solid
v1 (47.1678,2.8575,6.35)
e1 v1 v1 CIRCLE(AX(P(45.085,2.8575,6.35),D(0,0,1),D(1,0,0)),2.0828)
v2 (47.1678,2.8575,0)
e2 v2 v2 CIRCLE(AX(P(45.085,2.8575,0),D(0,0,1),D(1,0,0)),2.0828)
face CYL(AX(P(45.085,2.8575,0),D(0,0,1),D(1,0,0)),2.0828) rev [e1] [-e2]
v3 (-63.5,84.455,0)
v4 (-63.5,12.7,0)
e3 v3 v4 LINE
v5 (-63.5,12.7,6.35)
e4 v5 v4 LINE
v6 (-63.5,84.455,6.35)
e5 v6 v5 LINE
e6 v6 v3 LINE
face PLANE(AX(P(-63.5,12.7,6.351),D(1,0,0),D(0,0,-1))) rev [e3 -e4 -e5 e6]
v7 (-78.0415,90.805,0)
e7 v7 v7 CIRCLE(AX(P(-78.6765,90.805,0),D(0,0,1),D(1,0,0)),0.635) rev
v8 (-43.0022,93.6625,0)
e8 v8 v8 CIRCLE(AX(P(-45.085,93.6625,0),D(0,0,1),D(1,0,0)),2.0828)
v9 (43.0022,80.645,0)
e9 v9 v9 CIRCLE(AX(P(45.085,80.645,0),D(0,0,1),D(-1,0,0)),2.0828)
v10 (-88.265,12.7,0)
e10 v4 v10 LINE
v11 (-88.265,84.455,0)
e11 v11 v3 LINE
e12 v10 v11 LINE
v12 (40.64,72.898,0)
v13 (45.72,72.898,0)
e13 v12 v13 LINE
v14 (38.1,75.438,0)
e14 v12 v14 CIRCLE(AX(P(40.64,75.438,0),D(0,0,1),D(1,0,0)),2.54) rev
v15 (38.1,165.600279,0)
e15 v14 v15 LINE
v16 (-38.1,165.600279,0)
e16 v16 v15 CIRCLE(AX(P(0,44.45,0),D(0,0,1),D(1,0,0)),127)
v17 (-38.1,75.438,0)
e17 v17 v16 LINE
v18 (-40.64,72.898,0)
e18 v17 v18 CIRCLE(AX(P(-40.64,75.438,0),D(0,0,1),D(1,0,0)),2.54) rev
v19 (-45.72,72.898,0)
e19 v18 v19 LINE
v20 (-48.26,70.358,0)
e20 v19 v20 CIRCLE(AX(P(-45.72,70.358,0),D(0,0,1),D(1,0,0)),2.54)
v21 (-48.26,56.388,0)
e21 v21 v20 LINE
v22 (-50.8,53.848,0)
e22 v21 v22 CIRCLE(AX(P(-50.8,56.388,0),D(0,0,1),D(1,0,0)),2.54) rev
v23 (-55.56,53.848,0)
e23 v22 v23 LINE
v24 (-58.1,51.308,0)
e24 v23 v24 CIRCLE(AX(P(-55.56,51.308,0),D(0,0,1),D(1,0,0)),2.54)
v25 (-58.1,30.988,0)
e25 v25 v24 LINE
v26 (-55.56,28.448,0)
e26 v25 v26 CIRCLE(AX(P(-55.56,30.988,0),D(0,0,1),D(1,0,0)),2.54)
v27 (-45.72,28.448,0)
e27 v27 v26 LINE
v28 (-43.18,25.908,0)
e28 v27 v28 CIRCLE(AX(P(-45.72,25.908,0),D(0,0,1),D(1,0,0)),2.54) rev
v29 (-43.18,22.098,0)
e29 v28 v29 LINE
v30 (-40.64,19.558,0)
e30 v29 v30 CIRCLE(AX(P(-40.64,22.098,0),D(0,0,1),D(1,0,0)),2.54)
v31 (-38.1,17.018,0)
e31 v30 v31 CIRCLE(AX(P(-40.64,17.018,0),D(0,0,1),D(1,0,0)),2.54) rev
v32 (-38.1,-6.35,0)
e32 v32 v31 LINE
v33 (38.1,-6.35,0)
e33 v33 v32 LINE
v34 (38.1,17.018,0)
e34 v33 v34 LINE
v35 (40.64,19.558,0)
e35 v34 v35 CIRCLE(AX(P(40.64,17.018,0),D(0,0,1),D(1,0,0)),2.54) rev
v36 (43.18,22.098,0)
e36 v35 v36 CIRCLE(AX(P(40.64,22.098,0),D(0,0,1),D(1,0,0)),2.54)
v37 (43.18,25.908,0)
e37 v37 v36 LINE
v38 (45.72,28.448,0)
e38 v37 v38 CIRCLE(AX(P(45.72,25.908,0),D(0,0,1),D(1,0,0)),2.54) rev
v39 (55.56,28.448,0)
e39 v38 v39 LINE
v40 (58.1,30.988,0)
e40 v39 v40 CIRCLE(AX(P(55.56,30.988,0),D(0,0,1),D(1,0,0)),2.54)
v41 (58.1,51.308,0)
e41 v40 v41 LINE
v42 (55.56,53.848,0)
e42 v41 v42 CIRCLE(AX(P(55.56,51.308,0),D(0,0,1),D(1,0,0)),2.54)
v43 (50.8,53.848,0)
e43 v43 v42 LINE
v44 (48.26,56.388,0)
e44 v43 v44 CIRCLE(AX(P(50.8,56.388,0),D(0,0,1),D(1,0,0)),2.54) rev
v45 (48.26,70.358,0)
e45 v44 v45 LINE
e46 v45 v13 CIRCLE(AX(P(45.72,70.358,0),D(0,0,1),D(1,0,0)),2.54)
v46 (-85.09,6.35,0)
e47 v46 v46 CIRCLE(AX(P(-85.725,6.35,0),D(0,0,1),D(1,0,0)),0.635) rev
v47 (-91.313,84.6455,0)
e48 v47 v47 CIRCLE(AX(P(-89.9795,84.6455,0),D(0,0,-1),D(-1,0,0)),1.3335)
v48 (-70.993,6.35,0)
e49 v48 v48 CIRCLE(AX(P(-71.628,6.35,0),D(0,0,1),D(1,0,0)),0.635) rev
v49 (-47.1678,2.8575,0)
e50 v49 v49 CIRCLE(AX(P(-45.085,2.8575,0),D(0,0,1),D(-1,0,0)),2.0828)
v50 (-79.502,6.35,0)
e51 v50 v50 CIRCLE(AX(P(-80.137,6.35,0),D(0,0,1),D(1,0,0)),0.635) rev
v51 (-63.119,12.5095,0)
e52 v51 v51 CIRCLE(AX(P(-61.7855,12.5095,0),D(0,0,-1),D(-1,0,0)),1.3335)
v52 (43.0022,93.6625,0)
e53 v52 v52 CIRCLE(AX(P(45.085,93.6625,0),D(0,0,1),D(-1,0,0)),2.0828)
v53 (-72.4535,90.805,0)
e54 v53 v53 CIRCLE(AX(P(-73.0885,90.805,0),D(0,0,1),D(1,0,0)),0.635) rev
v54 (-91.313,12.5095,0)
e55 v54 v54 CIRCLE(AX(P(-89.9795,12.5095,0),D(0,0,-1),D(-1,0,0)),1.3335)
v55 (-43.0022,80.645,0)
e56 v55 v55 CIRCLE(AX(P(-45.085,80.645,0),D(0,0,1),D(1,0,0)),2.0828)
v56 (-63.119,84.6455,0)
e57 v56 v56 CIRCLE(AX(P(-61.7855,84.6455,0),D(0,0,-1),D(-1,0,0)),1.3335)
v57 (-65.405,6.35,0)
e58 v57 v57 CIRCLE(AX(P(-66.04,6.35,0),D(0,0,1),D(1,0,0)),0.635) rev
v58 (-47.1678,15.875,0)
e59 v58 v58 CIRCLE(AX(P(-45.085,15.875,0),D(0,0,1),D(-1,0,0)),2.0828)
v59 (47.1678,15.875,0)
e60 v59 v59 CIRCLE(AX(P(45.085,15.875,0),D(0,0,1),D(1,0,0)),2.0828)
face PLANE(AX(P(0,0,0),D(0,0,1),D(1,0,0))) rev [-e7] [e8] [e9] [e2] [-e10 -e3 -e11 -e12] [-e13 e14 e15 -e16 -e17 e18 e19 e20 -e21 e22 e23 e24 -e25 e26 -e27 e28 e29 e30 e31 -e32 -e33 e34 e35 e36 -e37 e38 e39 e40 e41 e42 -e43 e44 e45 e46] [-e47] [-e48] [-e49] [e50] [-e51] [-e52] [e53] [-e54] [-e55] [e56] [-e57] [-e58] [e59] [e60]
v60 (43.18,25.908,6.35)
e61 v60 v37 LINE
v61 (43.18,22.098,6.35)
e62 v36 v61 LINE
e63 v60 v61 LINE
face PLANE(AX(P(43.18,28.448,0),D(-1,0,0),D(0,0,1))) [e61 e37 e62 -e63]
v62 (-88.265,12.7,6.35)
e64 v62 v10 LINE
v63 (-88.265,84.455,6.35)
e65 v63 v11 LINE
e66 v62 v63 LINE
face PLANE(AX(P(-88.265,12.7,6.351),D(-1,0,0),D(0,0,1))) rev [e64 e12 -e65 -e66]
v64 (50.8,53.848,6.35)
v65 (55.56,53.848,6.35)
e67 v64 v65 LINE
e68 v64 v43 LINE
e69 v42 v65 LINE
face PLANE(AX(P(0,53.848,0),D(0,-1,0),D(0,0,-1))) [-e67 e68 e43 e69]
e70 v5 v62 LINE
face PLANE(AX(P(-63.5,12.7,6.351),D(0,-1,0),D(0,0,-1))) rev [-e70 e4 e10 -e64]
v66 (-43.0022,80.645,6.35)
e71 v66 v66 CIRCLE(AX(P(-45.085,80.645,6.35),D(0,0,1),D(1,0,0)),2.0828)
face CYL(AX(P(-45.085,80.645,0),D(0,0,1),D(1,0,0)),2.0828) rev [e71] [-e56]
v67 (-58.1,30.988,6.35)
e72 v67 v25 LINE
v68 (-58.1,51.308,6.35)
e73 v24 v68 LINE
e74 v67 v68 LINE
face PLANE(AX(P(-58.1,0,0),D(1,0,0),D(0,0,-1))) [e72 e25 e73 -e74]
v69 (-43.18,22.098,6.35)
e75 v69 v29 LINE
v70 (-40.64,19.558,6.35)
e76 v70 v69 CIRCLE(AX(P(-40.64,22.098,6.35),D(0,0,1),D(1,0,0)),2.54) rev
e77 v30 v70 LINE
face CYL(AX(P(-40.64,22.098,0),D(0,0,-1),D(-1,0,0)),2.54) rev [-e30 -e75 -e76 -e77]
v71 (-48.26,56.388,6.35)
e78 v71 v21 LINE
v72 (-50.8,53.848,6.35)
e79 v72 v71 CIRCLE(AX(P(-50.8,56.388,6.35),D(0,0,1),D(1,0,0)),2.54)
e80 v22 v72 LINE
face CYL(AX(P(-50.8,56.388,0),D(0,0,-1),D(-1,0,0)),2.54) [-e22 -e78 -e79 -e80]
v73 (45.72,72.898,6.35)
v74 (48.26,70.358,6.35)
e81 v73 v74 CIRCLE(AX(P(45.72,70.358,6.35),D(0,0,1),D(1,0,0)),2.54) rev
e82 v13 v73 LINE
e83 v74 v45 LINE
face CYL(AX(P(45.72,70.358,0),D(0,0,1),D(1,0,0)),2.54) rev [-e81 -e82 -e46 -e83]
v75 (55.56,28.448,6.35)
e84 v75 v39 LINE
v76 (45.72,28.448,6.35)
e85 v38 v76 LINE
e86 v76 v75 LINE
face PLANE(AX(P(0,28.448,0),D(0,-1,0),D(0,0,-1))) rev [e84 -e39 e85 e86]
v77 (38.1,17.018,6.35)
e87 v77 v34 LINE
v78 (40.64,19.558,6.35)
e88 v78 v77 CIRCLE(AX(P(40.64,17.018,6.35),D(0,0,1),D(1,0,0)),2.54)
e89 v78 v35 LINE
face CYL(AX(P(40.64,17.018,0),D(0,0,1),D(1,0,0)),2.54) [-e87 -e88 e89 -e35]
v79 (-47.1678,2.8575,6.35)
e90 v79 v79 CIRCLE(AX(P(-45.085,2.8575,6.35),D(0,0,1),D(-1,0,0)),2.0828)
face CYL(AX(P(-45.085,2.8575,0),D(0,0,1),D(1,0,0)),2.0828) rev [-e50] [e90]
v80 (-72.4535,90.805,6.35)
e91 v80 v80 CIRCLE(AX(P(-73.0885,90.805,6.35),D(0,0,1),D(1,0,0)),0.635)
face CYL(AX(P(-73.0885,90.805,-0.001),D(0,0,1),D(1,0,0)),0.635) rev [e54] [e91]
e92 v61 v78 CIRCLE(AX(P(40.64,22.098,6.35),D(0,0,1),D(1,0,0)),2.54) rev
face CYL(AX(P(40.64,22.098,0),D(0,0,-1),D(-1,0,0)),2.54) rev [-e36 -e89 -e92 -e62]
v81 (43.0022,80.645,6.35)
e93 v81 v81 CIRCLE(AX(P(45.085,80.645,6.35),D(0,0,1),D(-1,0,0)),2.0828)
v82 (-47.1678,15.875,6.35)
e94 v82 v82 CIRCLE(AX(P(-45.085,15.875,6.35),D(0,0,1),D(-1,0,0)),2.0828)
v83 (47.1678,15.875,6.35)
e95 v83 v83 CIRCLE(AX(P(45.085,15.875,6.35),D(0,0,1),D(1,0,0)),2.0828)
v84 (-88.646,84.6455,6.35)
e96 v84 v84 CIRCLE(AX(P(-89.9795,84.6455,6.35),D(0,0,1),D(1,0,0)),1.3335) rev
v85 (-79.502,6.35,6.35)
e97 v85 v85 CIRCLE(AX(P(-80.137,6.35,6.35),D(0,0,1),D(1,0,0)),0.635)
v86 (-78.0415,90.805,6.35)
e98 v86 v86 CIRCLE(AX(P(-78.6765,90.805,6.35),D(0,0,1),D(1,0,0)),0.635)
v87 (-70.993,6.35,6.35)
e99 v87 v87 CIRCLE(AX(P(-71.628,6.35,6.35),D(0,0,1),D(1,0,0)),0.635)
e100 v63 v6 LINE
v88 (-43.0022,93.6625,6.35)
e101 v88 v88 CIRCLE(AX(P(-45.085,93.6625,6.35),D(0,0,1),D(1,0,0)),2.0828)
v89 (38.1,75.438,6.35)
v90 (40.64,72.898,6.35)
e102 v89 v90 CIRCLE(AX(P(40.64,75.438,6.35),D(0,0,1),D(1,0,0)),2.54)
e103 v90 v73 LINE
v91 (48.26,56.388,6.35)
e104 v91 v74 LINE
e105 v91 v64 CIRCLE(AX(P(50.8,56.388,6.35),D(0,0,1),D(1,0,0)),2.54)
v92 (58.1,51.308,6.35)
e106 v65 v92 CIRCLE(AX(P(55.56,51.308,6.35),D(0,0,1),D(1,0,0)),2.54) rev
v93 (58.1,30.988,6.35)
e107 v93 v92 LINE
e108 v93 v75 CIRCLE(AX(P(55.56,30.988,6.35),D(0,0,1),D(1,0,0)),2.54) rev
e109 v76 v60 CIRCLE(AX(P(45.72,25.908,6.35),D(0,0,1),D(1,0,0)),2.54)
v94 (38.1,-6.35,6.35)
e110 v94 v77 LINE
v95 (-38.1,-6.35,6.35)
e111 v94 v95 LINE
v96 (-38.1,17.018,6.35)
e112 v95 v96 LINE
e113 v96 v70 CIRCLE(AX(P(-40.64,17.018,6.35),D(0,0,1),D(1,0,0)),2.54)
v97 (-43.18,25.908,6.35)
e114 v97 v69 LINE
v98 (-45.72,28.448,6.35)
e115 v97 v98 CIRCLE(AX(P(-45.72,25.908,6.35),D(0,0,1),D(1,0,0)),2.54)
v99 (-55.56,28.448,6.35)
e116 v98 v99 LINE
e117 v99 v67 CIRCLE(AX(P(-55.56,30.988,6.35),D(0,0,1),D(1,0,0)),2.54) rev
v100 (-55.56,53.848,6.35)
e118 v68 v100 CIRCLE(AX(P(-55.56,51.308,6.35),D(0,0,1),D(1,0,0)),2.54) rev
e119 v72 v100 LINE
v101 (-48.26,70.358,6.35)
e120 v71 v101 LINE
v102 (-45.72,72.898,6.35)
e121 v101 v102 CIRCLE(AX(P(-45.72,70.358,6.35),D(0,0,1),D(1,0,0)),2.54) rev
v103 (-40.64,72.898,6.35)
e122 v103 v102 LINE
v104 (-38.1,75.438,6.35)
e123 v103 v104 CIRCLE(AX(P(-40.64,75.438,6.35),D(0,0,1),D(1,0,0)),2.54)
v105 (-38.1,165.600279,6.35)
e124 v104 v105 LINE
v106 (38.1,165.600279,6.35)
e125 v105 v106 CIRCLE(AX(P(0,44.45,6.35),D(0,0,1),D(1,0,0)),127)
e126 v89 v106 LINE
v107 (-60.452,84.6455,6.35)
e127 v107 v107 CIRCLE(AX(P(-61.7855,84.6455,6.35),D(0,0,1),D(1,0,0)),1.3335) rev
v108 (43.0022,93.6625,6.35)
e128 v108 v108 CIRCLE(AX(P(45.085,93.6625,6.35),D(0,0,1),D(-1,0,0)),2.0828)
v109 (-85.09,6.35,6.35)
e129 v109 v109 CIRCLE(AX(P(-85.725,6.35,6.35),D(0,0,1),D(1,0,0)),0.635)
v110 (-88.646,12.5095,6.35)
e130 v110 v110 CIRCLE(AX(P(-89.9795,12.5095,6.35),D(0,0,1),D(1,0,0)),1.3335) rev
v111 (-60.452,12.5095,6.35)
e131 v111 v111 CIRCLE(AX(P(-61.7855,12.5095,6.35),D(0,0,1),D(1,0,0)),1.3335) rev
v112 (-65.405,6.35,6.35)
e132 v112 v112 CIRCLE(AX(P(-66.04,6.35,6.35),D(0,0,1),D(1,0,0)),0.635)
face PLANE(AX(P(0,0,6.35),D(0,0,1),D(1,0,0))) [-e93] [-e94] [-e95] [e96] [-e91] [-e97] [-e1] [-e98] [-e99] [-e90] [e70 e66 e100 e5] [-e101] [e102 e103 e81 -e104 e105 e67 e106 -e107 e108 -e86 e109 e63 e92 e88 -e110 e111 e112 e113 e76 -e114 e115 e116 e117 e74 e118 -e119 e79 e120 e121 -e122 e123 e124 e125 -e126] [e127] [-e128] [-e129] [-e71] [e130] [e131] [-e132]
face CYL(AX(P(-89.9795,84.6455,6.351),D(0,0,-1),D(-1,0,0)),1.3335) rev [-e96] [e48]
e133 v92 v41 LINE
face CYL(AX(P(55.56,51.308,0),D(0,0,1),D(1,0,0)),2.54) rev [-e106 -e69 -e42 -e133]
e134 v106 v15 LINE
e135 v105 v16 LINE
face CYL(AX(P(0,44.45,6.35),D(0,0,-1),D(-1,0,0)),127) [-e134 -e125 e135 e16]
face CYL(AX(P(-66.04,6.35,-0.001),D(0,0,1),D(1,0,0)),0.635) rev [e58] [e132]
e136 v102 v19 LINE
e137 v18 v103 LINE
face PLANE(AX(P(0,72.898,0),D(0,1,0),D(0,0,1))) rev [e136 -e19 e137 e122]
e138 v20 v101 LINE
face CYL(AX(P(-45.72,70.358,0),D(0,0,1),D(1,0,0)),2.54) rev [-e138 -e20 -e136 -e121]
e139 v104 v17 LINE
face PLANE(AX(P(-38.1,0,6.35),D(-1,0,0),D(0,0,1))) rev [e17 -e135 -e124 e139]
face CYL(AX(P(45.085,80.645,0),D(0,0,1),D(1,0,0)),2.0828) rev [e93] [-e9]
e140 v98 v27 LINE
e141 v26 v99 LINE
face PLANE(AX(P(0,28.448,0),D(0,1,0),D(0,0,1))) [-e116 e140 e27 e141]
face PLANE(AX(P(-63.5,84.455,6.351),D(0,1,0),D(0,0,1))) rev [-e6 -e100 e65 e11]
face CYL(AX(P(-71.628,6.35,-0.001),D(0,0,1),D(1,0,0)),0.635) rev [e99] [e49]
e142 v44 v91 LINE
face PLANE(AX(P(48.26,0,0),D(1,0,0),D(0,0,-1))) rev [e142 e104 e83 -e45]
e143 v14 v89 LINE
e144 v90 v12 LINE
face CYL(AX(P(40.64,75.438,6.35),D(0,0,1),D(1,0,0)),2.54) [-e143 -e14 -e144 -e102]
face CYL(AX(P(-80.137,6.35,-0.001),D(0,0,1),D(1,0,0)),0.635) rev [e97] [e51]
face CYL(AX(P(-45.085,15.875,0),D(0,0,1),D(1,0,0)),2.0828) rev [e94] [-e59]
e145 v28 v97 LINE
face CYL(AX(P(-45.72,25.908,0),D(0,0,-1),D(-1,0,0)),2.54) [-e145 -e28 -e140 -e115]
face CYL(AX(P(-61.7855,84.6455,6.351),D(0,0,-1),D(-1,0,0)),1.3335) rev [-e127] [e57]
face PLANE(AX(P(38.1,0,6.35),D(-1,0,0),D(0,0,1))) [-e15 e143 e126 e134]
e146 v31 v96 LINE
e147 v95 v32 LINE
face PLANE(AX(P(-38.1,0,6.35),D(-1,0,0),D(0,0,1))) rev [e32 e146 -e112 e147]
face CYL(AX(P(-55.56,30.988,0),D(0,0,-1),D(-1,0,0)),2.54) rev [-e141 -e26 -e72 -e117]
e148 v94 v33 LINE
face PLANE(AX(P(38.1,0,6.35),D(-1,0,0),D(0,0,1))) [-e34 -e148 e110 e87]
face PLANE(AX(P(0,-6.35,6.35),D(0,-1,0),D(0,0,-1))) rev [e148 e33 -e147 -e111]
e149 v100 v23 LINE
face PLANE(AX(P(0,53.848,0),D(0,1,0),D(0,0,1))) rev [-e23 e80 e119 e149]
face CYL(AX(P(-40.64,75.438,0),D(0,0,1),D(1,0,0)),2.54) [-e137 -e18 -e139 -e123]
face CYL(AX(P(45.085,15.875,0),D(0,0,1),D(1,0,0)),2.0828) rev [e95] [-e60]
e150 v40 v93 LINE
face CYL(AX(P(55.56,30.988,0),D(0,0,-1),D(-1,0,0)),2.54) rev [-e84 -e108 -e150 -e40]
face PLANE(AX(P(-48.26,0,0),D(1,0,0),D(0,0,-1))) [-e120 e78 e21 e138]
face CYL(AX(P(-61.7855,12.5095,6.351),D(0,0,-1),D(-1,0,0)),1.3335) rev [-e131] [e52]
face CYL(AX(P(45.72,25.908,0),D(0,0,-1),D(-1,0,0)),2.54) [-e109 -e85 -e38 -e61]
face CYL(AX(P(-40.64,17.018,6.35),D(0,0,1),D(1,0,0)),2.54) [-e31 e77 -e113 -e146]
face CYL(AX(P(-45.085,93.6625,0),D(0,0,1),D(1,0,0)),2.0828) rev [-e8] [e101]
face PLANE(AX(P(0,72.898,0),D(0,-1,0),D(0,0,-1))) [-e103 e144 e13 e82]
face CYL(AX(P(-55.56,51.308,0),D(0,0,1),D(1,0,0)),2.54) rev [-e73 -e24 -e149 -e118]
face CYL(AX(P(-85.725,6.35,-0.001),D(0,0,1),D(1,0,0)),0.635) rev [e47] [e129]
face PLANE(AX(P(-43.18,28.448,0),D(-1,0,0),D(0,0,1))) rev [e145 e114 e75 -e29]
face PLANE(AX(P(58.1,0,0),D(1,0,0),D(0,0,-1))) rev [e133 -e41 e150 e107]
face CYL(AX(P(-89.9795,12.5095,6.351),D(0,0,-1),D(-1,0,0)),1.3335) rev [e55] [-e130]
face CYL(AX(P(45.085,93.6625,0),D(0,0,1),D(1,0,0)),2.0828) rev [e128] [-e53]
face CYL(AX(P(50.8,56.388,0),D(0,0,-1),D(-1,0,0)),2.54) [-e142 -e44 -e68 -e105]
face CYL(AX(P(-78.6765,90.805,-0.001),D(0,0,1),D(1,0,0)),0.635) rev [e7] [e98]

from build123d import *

# Parameters (mm, degrees)
BOSS_EXTRUDE1_DEPTH = 6.35
CUT_EXTRUDE1_REACH  = 210.789
SKETCH2_R           = 1.3335
SKETCH2_W           = 24.765
SKETCH2_H           = 71.755
CUT_EXTRUDE2_REACH  = 210.789
SKETCH3_R           = 0.635
CUT_EXTRUDE3_DEPTH  = 209.788828163
FILLET1_START       = -1
FILLET1_DEPTH       = 8
FILLET1_2_DEPTH     = 6.35
SKETCH5_R           = 2.0828
CUT_EXTRUDE4_DEPTH  = 209.788828163


with BuildPart() as part:
    # Sketch1 → Boss-Extrude1 (new body)
    with BuildSketch(Plane.XY):
        with BuildLine():
            Line((-38.1, 92.71), (-38.1, 165.60027858))
            ThreePointArc((-38.1, 165.60027858), (0, -82.55), (38.1, 165.60027858))
            Line((38.1, 165.60027858), (38.1, 92.71))
            Line((38.1, 92.71), (38.1, -6.35))
            Line((38.1, -6.35), (-38.1, -6.35))
            Line((-38.1, -6.35), (-38.1, 92.71))
        make_face()
    extrude(amount=BOSS_EXTRUDE1_DEPTH)

    # Sketch2 → Cut-Extrude1 (cut, up to next)
    with BuildSketch(Plane(origin=(0, 0, 0), x_dir=(-1, 0, 0), z_dir=(0, 0, -1)), mode=Mode.PRIVATE) as cut_extrude1_sk1:
        with Locations((61.7855, 12.5095)):
            Circle(SKETCH2_R)
    cut_extrude1_tool1 = extrude(cut_extrude1_sk1.sketch, amount=-CUT_EXTRUDE1_REACH, mode=Mode.PRIVATE) & part.part
    # Sketch2 → Cut-Extrude1 (cut, up to next)
    with BuildSketch(Plane(origin=(0, 0, 0), x_dir=(-1, 0, 0), z_dir=(0, 0, -1)), mode=Mode.PRIVATE) as cut_extrude1_sk2:
        with Locations((61.7855, 84.6455)):
            Circle(SKETCH2_R)
    cut_extrude1_tool2 = extrude(cut_extrude1_sk2.sketch, amount=-CUT_EXTRUDE1_REACH, mode=Mode.PRIVATE) & part.part
    # Sketch2 → Cut-Extrude1 (cut, up to next)
    with BuildSketch(Plane(origin=(0, 0, 0), x_dir=(-1, 0, 0), z_dir=(0, 0, -1)), mode=Mode.PRIVATE) as cut_extrude1_sk3:
        with Locations((89.9795, 84.6455)):
            Circle(SKETCH2_R)
    cut_extrude1_tool3 = extrude(cut_extrude1_sk3.sketch, amount=-CUT_EXTRUDE1_REACH, mode=Mode.PRIVATE) & part.part
    # Sketch2 → Cut-Extrude1 (cut, up to next)
    with BuildSketch(Plane(origin=(0, 0, 0), x_dir=(-1, 0, 0), z_dir=(0, 0, -1)), mode=Mode.PRIVATE) as cut_extrude1_sk4:
        with Locations((89.9795, 12.5095)):
            Circle(SKETCH2_R)
    cut_extrude1_tool4 = extrude(cut_extrude1_sk4.sketch, amount=-CUT_EXTRUDE1_REACH, mode=Mode.PRIVATE) & part.part
    # Sketch2 → Cut-Extrude1 (cut, up to next)
    with BuildSketch(Plane(origin=(0, 0, 0), x_dir=(-1, 0, 0), z_dir=(0, 0, -1)), mode=Mode.PRIVATE) as cut_extrude1_sk5:
        with Locations((75.8825, 48.5775)):
            Rectangle(SKETCH2_W, SKETCH2_H)
    cut_extrude1_tool5 = extrude(cut_extrude1_sk5.sketch, amount=-CUT_EXTRUDE1_REACH, mode=Mode.PRIVATE) & part.part
    add(cut_extrude1_tool1.solids().sort_by_distance((-61.7855, 12.5095, 0))[0], mode=Mode.SUBTRACT)
    add(cut_extrude1_tool2.solids().sort_by_distance((-61.7855, 84.6455, 0))[0], mode=Mode.SUBTRACT)
    add(cut_extrude1_tool3.solids().sort_by_distance((-89.9795, 84.6455, 0))[0], mode=Mode.SUBTRACT)
    add(cut_extrude1_tool4.solids().sort_by_distance((-89.9795, 12.5095, 0))[0], mode=Mode.SUBTRACT)
    add(cut_extrude1_tool5.solids().sort_by_distance((-75.8825, 48.5775, 0))[0], mode=Mode.SUBTRACT)

    # Sketch3 → Cut-Extrude2 (cut, up to next)
    with BuildSketch(Plane.XY.offset(6.35), mode=Mode.PRIVATE) as cut_extrude2_sk1:
        with Locations((-66.04, 6.35)):
            Circle(SKETCH3_R)
    cut_extrude2_tool1 = extrude(cut_extrude2_sk1.sketch, amount=-CUT_EXTRUDE2_REACH, mode=Mode.PRIVATE) & part.part
    # Sketch3 → Cut-Extrude2 (cut, up to next)
    with BuildSketch(Plane.XY.offset(6.35), mode=Mode.PRIVATE) as cut_extrude2_sk2:
        with Locations((-71.628, 6.35)):
            Circle(SKETCH3_R)
    cut_extrude2_tool2 = extrude(cut_extrude2_sk2.sketch, amount=-CUT_EXTRUDE2_REACH, mode=Mode.PRIVATE) & part.part
    # Sketch3 → Cut-Extrude2 (cut, up to next)
    with BuildSketch(Plane.XY.offset(6.35), mode=Mode.PRIVATE) as cut_extrude2_sk3:
        with Locations((-80.137, 6.35)):
            Circle(SKETCH3_R)
    cut_extrude2_tool3 = extrude(cut_extrude2_sk3.sketch, amount=-CUT_EXTRUDE2_REACH, mode=Mode.PRIVATE) & part.part
    # Sketch3 → Cut-Extrude2 (cut, up to next)
    with BuildSketch(Plane.XY.offset(6.35), mode=Mode.PRIVATE) as cut_extrude2_sk4:
        with Locations((-85.725, 6.35)):
            Circle(SKETCH3_R)
    cut_extrude2_tool4 = extrude(cut_extrude2_sk4.sketch, amount=-CUT_EXTRUDE2_REACH, mode=Mode.PRIVATE) & part.part
    # Sketch3 → Cut-Extrude2 (cut, up to next)
    with BuildSketch(Plane.XY.offset(6.35), mode=Mode.PRIVATE) as cut_extrude2_sk5:
        with Locations((-73.0885, 90.805)):
            Circle(SKETCH3_R)
    cut_extrude2_tool5 = extrude(cut_extrude2_sk5.sketch, amount=-CUT_EXTRUDE2_REACH, mode=Mode.PRIVATE) & part.part
    # Sketch3 → Cut-Extrude2 (cut, up to next)
    with BuildSketch(Plane.XY.offset(6.35), mode=Mode.PRIVATE) as cut_extrude2_sk6:
        with Locations((-78.6765, 90.805)):
            Circle(SKETCH3_R)
    cut_extrude2_tool6 = extrude(cut_extrude2_sk6.sketch, amount=-CUT_EXTRUDE2_REACH, mode=Mode.PRIVATE) & part.part
    add(cut_extrude2_tool1.solids().sort_by_distance((-66.04, 6.35, 6.35))[0], mode=Mode.SUBTRACT)
    add(cut_extrude2_tool2.solids().sort_by_distance((-71.628, 6.35, 6.35))[0], mode=Mode.SUBTRACT)
    add(cut_extrude2_tool3.solids().sort_by_distance((-80.137, 6.35, 6.35))[0], mode=Mode.SUBTRACT)
    add(cut_extrude2_tool4.solids().sort_by_distance((-85.725, 6.35, 6.35))[0], mode=Mode.SUBTRACT)
    add(cut_extrude2_tool5.solids().sort_by_distance((-73.0885, 90.805, 6.35))[0], mode=Mode.SUBTRACT)
    add(cut_extrude2_tool6.solids().sort_by_distance((-78.6765, 90.805, 6.35))[0], mode=Mode.SUBTRACT)

    # Sketch4 → Cut-Extrude3 (cut, through all)
    with BuildSketch(Plane.XY.offset(6.35)):
        Polygon((-48.26, 72.898), (-48.26, 53.848), (-58.1, 53.848), (-58.1, 28.448), (-43.18, 28.448), (-43.18, 19.558), (-38.1, 19.558), (-38.1, 72.898), align=None)
        Polygon((43.18, 28.448), (58.1, 28.448), (58.1, 53.848), (48.26, 53.848), (48.26, 72.898), (38.1, 72.898), (38.1, 19.558), (43.18, 19.558), align=None)
    extrude(amount=-CUT_EXTRUDE3_DEPTH, mode=Mode.SUBTRACT)

    # Fillet1: read off the stored shape, not the designer's step
    # Fillet1 outline → Fillet1 (cut)
    with BuildSketch(Plane.XY.offset(FILLET1_START)):
        with BuildLine():
            Line((38.1, 72.898), (40.64, 72.898))
            ThreePointArc((40.64, 72.898), (38.843948776, 73.641948776), (38.1, 75.438))
            Line((38.1, 75.438), (38.1, 72.898))
        make_face()
        with BuildLine():
            Line((48.26, 53.848), (50.8, 53.848))
            ThreePointArc((50.8, 53.848), (49.003948776, 54.591948776), (48.26, 56.388))
            Line((48.26, 56.388), (48.26, 53.848))
        make_face()
        with BuildLine():
            Line((43.18, 28.448), (43.18, 25.908))
            ThreePointArc((43.18, 25.908), (43.923948776, 27.704051224), (45.72, 28.448))
            Line((45.72, 28.448), (43.18, 28.448))
        make_face()
        with BuildLine():
            ThreePointArc((38.1, 17.018), (38.843948776, 18.814051224), (40.64, 19.558))
            Line((40.64, 19.558), (38.1, 19.558))
            Line((38.1, 19.558), (38.1, 17.018))
        make_face()
        with BuildLine():
            Line((-38.1, 19.558), (-40.64, 19.558))
            ThreePointArc((-40.64, 19.558), (-38.843948776, 18.814051224), (-38.1, 17.018))
            Line((-38.1, 17.018), (-38.1, 19.558))
        make_face()
        with BuildLine():
            ThreePointArc((-38.1, 75.438), (-38.843948776, 73.641948776), (-40.64, 72.898))
            Line((-40.64, 72.898), (-38.1, 72.898))
            Line((-38.1, 72.898), (-38.1, 75.438))
        make_face()
        with BuildLine():
            ThreePointArc((-48.26, 56.388), (-49.003948776, 54.591948776), (-50.8, 53.848))
            Line((-50.8, 53.848), (-48.26, 53.848))
            Line((-48.26, 53.848), (-48.26, 56.388))
        make_face()
        with BuildLine():
            ThreePointArc((-45.72, 28.448), (-43.923948776, 27.704051224), (-43.18, 25.908))
            Line((-43.18, 25.908), (-43.18, 28.448))
            Line((-43.18, 28.448), (-45.72, 28.448))
        make_face()
    extrude(amount=FILLET1_DEPTH, mode=Mode.SUBTRACT)

    # Fillet1 2 outline → Fillet1 2 (add)
    with BuildSketch(Plane.XY):
        with BuildLine():
            Line((43.18, 19.558), (43.18, 22.098))
            ThreePointArc((43.18, 22.098), (42.436051224, 20.301948776), (40.64, 19.558))
            Line((40.64, 19.558), (43.18, 19.558))
        make_face()
        with BuildLine():
            ThreePointArc((45.72, 72.898), (47.516051224, 72.154051224), (48.26, 70.358))
            Line((48.26, 70.358), (48.26, 72.898))
            Line((48.26, 72.898), (45.72, 72.898))
        make_face()
        with BuildLine():
            ThreePointArc((55.56, 53.848), (57.356051224, 53.104051224), (58.1, 51.308))
            Line((58.1, 51.308), (58.1, 53.848))
            Line((58.1, 53.848), (55.56, 53.848))
        make_face()
        with BuildLine():
            ThreePointArc((58.1, 30.988), (57.356051224, 29.191948776), (55.56, 28.448))
            Line((55.56, 28.448), (58.1, 28.448))
            Line((58.1, 28.448), (58.1, 30.988))
        make_face()
        with BuildLine():
            Line((-43.18, 19.558), (-40.64, 19.558))
            ThreePointArc((-40.64, 19.558), (-42.436051224, 20.301948776), (-43.18, 22.098))
            Line((-43.18, 22.098), (-43.18, 19.558))
        make_face()
        with BuildLine():
            Line((-48.26, 72.898), (-48.26, 70.358))
            ThreePointArc((-48.26, 70.358), (-47.516051224, 72.154051224), (-45.72, 72.898))
            Line((-45.72, 72.898), (-48.26, 72.898))
        make_face()
        with BuildLine():
            Line((-58.1, 53.848), (-58.1, 51.308))
            ThreePointArc((-58.1, 51.308), (-57.356051224, 53.104051224), (-55.56, 53.848))
            Line((-55.56, 53.848), (-58.1, 53.848))
        make_face()
        with BuildLine():
            Line((-58.1, 28.448), (-55.56, 28.448))
            ThreePointArc((-55.56, 28.448), (-57.356051224, 29.191948776), (-58.1, 30.988))
            Line((-58.1, 30.988), (-58.1, 28.448))
        make_face()
    extrude(amount=FILLET1_2_DEPTH)

    # Sketch5 → Cut-Extrude4 (cut, through all)
    with BuildSketch(Plane.XY.offset(6.35)):
        with Locations((-45.085, 80.645)):
            Circle(SKETCH5_R)
        with Locations(Location((45.085, 80.645, 0), (0, 0, 180))):
            Circle(SKETCH5_R)
        with Locations((45.085, 15.875)):
            Circle(SKETCH5_R)
        with Locations(Location((-45.085, 15.875, 0), (0, 0, 180))):
            Circle(SKETCH5_R)
        with Locations((-45.085, 93.6625)):
            Circle(SKETCH5_R)
        with Locations(Location((45.085, 93.6625, 0), (0, 0, 180))):
            Circle(SKETCH5_R)
        with Locations((45.085, 2.8575)):
            Circle(SKETCH5_R)
        with Locations(Location((-45.085, 2.8575, 0), (0, 0, 180))):
            Circle(SKETCH5_R)
    extrude(amount=-CUT_EXTRUDE4_DEPTH, mode=Mode.SUBTRACT)


solid = part.part
